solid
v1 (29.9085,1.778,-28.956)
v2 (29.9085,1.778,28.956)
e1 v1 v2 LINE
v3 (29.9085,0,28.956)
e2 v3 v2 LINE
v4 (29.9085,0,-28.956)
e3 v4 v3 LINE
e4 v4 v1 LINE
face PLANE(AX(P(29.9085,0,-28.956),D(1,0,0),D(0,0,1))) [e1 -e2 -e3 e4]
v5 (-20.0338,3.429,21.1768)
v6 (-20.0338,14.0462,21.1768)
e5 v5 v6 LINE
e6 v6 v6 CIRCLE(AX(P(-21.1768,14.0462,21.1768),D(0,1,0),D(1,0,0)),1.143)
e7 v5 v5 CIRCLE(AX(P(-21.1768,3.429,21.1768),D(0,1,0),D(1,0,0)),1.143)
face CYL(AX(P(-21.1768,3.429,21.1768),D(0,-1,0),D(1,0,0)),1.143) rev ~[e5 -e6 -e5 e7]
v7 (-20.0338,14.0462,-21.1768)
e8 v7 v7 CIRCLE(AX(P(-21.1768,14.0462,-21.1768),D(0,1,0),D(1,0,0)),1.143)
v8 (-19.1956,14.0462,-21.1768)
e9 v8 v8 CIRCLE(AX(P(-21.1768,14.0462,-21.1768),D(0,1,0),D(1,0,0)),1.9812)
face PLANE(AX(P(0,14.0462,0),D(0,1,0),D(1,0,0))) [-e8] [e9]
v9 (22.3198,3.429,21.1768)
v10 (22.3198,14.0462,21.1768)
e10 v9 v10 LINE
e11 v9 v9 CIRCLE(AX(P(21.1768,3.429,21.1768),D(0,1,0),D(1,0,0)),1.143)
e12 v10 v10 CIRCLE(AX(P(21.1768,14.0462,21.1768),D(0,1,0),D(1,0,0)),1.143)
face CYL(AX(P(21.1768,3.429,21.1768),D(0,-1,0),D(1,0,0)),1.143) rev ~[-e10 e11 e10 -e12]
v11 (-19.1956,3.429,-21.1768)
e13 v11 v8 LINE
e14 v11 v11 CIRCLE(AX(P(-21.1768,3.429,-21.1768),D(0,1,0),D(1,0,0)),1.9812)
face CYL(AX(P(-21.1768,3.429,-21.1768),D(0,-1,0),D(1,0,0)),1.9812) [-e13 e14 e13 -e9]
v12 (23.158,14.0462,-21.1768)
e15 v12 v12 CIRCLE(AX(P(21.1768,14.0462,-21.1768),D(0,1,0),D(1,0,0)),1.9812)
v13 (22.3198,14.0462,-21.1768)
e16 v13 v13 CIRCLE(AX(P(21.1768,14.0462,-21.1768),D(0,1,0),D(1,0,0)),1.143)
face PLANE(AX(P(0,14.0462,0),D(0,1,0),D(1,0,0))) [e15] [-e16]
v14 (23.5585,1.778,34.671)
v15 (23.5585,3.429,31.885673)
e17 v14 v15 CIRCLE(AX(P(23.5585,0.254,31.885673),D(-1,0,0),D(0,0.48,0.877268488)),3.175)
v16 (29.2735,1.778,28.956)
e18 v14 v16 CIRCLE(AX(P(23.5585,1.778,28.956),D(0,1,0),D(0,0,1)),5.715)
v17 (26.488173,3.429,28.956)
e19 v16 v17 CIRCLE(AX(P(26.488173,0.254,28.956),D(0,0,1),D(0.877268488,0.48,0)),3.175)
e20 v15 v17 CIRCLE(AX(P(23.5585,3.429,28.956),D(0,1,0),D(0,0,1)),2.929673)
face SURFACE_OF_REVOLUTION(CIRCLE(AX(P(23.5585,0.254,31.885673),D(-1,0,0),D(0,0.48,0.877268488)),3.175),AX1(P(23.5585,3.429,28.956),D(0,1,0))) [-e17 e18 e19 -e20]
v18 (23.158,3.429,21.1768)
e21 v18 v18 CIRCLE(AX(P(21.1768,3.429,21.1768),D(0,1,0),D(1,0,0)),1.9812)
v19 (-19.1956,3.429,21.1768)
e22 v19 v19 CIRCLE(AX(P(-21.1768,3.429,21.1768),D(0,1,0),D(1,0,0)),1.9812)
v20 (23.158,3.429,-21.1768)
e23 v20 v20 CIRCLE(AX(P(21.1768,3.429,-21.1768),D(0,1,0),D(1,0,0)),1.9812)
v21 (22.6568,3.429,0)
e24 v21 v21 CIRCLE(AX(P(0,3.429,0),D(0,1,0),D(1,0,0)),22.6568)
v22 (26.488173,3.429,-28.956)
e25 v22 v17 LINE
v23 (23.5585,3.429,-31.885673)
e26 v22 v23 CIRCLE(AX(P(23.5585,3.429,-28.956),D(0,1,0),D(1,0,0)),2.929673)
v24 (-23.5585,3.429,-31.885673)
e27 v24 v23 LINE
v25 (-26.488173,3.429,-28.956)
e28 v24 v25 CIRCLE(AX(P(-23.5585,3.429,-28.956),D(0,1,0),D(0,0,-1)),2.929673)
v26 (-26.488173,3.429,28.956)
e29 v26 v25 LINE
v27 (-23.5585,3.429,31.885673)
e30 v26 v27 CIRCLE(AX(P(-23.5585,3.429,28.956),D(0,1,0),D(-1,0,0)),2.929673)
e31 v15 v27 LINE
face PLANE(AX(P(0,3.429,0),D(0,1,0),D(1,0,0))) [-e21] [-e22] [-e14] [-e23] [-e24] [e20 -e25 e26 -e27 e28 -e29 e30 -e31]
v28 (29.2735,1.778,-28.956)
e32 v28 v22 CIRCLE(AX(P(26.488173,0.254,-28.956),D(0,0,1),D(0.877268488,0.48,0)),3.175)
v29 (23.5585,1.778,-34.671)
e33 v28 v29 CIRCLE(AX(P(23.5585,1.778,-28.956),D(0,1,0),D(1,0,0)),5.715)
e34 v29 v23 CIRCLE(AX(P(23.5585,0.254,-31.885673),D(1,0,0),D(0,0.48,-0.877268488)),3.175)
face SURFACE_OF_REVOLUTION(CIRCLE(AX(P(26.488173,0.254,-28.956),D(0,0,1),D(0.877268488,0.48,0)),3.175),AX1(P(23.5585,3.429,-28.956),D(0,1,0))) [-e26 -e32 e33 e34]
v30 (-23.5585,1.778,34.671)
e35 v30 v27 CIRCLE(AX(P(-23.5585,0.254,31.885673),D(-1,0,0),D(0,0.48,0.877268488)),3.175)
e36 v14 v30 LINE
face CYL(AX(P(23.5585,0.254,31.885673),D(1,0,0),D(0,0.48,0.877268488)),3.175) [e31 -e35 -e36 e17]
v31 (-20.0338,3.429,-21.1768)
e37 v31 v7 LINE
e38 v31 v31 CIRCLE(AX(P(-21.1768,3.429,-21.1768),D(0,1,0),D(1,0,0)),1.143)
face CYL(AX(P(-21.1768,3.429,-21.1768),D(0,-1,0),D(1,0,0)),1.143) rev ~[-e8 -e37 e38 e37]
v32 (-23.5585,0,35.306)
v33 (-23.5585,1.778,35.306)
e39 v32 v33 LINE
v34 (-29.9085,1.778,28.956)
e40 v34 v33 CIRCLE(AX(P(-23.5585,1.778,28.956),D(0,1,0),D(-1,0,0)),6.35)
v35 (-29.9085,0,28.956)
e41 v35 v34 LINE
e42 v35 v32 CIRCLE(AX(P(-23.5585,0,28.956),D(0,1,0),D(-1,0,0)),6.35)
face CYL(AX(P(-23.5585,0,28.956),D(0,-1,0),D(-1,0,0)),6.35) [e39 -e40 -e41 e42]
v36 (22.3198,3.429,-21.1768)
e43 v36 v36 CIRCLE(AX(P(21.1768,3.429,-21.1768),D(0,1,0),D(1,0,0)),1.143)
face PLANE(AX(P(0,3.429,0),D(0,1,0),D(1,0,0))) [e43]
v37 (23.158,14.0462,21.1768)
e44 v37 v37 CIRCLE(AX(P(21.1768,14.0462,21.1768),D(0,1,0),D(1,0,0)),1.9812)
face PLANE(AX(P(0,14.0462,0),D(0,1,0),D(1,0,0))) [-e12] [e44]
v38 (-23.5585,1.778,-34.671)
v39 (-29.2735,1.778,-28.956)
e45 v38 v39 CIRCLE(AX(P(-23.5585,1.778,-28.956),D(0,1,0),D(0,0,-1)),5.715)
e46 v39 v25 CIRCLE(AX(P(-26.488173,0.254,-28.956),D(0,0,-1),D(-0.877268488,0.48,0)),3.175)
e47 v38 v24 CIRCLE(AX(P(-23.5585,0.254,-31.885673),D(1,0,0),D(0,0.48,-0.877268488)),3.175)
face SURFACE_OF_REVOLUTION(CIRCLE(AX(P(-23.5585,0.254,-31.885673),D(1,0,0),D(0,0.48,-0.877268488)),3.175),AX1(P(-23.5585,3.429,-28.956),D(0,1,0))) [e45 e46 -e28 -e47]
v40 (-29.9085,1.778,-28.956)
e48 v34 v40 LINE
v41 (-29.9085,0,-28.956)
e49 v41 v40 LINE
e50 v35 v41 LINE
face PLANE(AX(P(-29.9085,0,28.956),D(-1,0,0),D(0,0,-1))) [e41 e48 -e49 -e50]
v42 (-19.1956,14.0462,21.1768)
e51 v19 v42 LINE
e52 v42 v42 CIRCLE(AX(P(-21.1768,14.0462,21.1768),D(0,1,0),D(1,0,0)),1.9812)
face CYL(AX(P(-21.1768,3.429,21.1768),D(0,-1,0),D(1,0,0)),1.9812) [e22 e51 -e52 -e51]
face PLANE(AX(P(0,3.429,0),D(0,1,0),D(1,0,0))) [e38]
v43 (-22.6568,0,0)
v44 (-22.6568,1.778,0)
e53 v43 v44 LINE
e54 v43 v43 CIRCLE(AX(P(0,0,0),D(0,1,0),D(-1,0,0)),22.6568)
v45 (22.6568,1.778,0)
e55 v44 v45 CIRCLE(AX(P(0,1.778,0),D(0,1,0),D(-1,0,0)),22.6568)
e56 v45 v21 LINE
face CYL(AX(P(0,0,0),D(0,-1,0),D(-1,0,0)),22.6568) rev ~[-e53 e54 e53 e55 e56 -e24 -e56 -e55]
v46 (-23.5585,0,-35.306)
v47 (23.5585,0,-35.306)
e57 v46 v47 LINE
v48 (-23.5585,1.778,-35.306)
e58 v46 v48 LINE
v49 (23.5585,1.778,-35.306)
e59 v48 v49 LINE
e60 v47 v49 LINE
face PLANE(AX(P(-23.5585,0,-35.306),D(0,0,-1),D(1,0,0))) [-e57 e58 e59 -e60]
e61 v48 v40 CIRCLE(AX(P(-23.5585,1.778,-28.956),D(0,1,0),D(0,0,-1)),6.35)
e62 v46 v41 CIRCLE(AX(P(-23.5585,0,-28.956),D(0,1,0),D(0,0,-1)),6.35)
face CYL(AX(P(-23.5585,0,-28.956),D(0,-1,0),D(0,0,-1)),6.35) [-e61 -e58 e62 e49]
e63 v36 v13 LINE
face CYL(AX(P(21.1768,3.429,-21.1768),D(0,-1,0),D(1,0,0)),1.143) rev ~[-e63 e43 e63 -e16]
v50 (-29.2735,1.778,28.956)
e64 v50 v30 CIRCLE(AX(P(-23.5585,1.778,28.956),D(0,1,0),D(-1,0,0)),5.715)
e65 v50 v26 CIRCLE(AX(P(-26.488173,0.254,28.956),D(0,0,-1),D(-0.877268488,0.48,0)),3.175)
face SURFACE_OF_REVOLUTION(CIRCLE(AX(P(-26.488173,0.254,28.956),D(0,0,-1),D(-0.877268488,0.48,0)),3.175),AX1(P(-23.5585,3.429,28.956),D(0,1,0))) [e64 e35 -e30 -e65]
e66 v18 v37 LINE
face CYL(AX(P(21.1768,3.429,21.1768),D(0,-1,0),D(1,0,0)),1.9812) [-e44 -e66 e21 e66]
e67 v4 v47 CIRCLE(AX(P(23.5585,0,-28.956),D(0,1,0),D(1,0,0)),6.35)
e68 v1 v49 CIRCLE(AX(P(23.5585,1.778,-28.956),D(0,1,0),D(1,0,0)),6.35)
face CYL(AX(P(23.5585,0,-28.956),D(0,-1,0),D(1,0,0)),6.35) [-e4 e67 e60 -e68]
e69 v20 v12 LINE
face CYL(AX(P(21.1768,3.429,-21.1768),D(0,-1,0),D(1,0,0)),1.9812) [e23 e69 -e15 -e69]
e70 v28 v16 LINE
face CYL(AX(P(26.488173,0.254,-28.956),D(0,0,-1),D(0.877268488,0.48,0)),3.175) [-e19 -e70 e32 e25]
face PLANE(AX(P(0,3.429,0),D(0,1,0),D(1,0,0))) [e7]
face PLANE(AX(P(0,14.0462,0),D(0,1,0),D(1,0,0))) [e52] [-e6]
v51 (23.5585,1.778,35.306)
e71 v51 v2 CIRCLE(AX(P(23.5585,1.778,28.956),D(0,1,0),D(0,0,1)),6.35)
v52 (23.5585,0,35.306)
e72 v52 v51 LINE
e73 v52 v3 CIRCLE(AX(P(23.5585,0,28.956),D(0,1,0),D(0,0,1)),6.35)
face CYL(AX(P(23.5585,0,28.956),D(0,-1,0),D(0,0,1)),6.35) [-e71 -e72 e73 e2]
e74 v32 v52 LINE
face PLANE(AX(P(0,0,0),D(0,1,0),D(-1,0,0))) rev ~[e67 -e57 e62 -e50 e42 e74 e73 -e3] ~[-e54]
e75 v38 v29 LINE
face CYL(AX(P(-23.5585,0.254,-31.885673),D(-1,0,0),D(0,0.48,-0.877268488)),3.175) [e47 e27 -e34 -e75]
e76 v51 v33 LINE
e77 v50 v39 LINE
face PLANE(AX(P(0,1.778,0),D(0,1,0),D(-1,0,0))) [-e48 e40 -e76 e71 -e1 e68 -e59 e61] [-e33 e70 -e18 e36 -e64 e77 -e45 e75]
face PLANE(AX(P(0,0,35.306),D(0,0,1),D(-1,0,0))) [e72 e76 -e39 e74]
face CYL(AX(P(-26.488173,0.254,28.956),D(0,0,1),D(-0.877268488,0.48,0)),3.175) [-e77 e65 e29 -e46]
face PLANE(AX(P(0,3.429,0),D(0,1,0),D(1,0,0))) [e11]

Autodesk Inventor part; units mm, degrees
ref_plane "YZ Plane" through (0, 0, 0) normal (1, 0, 0) x (0, 1, 0)
ref_plane "XZ Plane" through (0, 0, 0) normal (0, 1, 0) x (-1, 0, 0)
ref_plane "XY Plane" through (0, 0, 0) normal (0, 0, 1) x (1, 0, 0)
sketch "Sketch1" plane through (0, 0, 0) normal (0, 1, 0) x (-1, 0, 0)
  circle A0 centre (0, 0) radius 22.6568
  line L0 (0, 35.306) -> (23.5585, 35.306)
  line L1 (29.9085, 28.956) -> (29.9085, -28.956)
  line L2 (23.5585, -35.306) -> (-23.5585, -35.306)
  line L3 (-29.9085, -28.956) -> (-29.9085, 28.956)
  line L4 (-23.5585, 35.306) -> (0, 35.306)
  arc A1 (29.9085, 28.956) -> (23.5585, 35.306) centre (23.5585, 28.956) ccw
  arc A2 (23.5585, -35.306) -> (29.9085, -28.956) centre (23.5585, -28.956) ccw
  arc A3 (-29.9085, -28.956) -> (-23.5585, -35.306) centre (-23.5585, -28.956) ccw
  arc A4 (-23.5585, 35.306) -> (-29.9085, 28.956) centre (-23.5585, 28.956) ccw
  point P0 (29.9085, 35.306)
  point P1 (29.9085, -35.306)
  point P2 (-29.9085, -35.306)
  dimension "d0" = 45.3136
  dimension "d1" = 35.306
  dimension "d2" = 29.9085
  dimension "d3" = 70.612
  dimension "d4" = 59.817
  dimension "d5" = 6.35
extrude "Extrusion1" add sketch "Sketch1" along normal blind 1.778
sketch "Sketch2" plane through (0, 1.778, 0) normal (0, 1, 0) x (1, 0, 0)
  circle A0 centre (0, 0) radius 22.6568 projected
  line L0 (-23.5585, -35.306) -> (23.5585, -35.306) projected
  line L1 (29.9085, -28.956) -> (29.9085, 28.956) projected
  line L2 (23.5585, 35.306) -> (-23.5585, 35.306) projected
  line L3 (-29.9085, 28.956) -> (-29.9085, -28.956) projected
  line L4 (0, 35.306) -> (0, 34.671)
  line L5 (29.9085, 0) -> (29.2735, 0)
  line L6 (0, -35.306) -> (0, -34.671)
  line L7 (-29.9085, 0) -> (-29.2735, 0)
  line L8 (0, 34.671) -> (-23.5585, 34.671)
  line L9 (-29.2735, 28.956) -> (-29.2735, 0)
  line L10 (0, 34.671) -> (23.5585, 34.671)
  line L11 (29.2735, 28.956) -> (29.2735, 0)
  line L12 (0, -34.671) -> (23.5585, -34.671)
  line L13 (29.2735, -28.956) -> (29.2735, 0)
  line L14 (0, -34.671) -> (-23.5585, -34.671)
  line L15 (-29.2735, -28.956) -> (-29.2735, 0)
  arc A1 (23.5585, -34.671) -> (29.2735, -28.956) centre (23.5585, -28.956) ccw
  arc A2 (29.2735, 28.956) -> (23.5585, 34.671) centre (23.5585, 28.956) ccw
  arc A3 (-23.5585, 34.671) -> (-29.2735, 28.956) centre (-23.5585, 28.956) ccw
  arc A4 (-29.2735, -28.956) -> (-23.5585, -34.671) centre (-23.5585, -28.956) ccw
  circle A5 centre (0, 0) radius 22.6568
  dimension "d8" = 0.635
  dimension "d9" = 0.635
  dimension "d10" = 0.635
  dimension "d11" = 0.635
  dimension "d12" = 5.715
extrude "Extrusion2" add sketch "Sketch2" along normal blind 1.651
fillet "Fillet1" radius 3.175 8 edges at (27.5996, 3.429, -32.9971) (0, 3.429, -34.671) (-27.5996, 3.429, -32.9971) (-29.2735, 3.429, 0) (-27.5996, 3.429, 32.9971) (0, 3.429, 34.671) (27.5996, 3.429, 32.9971) (29.2735, 3.429, 0)
sketch "Sketch3" plane through (0, 3.429, 0) normal (0, 1, 0) x (1, 0, 0)
  circle A0 centre (0, 0) radius 22.6568 projected
  circle A1 centre (0, 0) radius 25.146
  line L0 (-26.2636, 0) -> (-25.5008, 22.4355)
  line L1 (-22.4355, 25.5008) -> (0, 26.2636)
  line L2 (0, 26.2636) -> (22.4355, 25.5008)
  line L3 (25.5008, 22.4355) -> (26.2636, 0)
  line L4 (26.2636, 0) -> (25.5008, -22.4355)
  line L5 (22.4355, -25.5008) -> (0, -26.2636)
  line L6 (0, -26.2636) -> (-22.4355, -25.5008)
  line L7 (-25.5008, -22.4355) -> (-26.2636, 0)
  arc A2 (25.5008, 22.4355) -> (22.4355, 25.5008) centre (22.3276, 22.3276) ccw
  arc A3 (22.4355, -25.5008) -> (25.5008, -22.4355) centre (22.3276, -22.3276) ccw
  arc A4 (-25.5008, -22.4355) -> (-22.4355, -25.5008) centre (-22.3276, -22.3276) ccw
  arc A5 (-22.4355, 25.5008) -> (-25.5008, 22.4355) centre (-22.3276, 22.3276) ccw
  circle A6 centre (-21.1768, 21.1768) radius 1.9812
  circle A7 centre (-21.1768, 21.1768) radius 1.143
  circle A8 centre (21.1768, 21.1768) radius 1.9812
  circle A9 centre (21.1768, 21.1768) radius 1.143
  circle A10 centre (21.1768, -21.1768) radius 1.9812
  circle A11 centre (21.1768, -21.1768) radius 1.143
  circle A12 centre (-21.1768, -21.1768) radius 1.9812
  circle A13 centre (-21.1768, -21.1768) radius 1.143
  point P0 (25.4, 25.4)
  point P1 (-25.4, -25.4)
  point P2 (-25.4, 25.4)
  point P3 (25.4, -25.4)
  dimension "d20" = 50.8
  dimension "d36" = 50.292
  dimension "d39" = 50.8
  dimension "d40" = 50.8
  dimension "d41" = 50.8
  dimension "d46" = 3.175
  dimension "d47" = 3.9624
  dimension "d48" = 2.286
  dimension "d49" = 3.9624
  dimension "d50" = 2.286
  dimension "d51" = 3.9624
  dimension "d52" = 2.286
  dimension "d53" = 3.9624
  dimension "d54" = 2.286
extrude "Extrusion4" add sketch "Sketch3" along normal blind 10.6172 contours A6 | A8 | A10 | A12
properties part number "Speaker Front Plate"
